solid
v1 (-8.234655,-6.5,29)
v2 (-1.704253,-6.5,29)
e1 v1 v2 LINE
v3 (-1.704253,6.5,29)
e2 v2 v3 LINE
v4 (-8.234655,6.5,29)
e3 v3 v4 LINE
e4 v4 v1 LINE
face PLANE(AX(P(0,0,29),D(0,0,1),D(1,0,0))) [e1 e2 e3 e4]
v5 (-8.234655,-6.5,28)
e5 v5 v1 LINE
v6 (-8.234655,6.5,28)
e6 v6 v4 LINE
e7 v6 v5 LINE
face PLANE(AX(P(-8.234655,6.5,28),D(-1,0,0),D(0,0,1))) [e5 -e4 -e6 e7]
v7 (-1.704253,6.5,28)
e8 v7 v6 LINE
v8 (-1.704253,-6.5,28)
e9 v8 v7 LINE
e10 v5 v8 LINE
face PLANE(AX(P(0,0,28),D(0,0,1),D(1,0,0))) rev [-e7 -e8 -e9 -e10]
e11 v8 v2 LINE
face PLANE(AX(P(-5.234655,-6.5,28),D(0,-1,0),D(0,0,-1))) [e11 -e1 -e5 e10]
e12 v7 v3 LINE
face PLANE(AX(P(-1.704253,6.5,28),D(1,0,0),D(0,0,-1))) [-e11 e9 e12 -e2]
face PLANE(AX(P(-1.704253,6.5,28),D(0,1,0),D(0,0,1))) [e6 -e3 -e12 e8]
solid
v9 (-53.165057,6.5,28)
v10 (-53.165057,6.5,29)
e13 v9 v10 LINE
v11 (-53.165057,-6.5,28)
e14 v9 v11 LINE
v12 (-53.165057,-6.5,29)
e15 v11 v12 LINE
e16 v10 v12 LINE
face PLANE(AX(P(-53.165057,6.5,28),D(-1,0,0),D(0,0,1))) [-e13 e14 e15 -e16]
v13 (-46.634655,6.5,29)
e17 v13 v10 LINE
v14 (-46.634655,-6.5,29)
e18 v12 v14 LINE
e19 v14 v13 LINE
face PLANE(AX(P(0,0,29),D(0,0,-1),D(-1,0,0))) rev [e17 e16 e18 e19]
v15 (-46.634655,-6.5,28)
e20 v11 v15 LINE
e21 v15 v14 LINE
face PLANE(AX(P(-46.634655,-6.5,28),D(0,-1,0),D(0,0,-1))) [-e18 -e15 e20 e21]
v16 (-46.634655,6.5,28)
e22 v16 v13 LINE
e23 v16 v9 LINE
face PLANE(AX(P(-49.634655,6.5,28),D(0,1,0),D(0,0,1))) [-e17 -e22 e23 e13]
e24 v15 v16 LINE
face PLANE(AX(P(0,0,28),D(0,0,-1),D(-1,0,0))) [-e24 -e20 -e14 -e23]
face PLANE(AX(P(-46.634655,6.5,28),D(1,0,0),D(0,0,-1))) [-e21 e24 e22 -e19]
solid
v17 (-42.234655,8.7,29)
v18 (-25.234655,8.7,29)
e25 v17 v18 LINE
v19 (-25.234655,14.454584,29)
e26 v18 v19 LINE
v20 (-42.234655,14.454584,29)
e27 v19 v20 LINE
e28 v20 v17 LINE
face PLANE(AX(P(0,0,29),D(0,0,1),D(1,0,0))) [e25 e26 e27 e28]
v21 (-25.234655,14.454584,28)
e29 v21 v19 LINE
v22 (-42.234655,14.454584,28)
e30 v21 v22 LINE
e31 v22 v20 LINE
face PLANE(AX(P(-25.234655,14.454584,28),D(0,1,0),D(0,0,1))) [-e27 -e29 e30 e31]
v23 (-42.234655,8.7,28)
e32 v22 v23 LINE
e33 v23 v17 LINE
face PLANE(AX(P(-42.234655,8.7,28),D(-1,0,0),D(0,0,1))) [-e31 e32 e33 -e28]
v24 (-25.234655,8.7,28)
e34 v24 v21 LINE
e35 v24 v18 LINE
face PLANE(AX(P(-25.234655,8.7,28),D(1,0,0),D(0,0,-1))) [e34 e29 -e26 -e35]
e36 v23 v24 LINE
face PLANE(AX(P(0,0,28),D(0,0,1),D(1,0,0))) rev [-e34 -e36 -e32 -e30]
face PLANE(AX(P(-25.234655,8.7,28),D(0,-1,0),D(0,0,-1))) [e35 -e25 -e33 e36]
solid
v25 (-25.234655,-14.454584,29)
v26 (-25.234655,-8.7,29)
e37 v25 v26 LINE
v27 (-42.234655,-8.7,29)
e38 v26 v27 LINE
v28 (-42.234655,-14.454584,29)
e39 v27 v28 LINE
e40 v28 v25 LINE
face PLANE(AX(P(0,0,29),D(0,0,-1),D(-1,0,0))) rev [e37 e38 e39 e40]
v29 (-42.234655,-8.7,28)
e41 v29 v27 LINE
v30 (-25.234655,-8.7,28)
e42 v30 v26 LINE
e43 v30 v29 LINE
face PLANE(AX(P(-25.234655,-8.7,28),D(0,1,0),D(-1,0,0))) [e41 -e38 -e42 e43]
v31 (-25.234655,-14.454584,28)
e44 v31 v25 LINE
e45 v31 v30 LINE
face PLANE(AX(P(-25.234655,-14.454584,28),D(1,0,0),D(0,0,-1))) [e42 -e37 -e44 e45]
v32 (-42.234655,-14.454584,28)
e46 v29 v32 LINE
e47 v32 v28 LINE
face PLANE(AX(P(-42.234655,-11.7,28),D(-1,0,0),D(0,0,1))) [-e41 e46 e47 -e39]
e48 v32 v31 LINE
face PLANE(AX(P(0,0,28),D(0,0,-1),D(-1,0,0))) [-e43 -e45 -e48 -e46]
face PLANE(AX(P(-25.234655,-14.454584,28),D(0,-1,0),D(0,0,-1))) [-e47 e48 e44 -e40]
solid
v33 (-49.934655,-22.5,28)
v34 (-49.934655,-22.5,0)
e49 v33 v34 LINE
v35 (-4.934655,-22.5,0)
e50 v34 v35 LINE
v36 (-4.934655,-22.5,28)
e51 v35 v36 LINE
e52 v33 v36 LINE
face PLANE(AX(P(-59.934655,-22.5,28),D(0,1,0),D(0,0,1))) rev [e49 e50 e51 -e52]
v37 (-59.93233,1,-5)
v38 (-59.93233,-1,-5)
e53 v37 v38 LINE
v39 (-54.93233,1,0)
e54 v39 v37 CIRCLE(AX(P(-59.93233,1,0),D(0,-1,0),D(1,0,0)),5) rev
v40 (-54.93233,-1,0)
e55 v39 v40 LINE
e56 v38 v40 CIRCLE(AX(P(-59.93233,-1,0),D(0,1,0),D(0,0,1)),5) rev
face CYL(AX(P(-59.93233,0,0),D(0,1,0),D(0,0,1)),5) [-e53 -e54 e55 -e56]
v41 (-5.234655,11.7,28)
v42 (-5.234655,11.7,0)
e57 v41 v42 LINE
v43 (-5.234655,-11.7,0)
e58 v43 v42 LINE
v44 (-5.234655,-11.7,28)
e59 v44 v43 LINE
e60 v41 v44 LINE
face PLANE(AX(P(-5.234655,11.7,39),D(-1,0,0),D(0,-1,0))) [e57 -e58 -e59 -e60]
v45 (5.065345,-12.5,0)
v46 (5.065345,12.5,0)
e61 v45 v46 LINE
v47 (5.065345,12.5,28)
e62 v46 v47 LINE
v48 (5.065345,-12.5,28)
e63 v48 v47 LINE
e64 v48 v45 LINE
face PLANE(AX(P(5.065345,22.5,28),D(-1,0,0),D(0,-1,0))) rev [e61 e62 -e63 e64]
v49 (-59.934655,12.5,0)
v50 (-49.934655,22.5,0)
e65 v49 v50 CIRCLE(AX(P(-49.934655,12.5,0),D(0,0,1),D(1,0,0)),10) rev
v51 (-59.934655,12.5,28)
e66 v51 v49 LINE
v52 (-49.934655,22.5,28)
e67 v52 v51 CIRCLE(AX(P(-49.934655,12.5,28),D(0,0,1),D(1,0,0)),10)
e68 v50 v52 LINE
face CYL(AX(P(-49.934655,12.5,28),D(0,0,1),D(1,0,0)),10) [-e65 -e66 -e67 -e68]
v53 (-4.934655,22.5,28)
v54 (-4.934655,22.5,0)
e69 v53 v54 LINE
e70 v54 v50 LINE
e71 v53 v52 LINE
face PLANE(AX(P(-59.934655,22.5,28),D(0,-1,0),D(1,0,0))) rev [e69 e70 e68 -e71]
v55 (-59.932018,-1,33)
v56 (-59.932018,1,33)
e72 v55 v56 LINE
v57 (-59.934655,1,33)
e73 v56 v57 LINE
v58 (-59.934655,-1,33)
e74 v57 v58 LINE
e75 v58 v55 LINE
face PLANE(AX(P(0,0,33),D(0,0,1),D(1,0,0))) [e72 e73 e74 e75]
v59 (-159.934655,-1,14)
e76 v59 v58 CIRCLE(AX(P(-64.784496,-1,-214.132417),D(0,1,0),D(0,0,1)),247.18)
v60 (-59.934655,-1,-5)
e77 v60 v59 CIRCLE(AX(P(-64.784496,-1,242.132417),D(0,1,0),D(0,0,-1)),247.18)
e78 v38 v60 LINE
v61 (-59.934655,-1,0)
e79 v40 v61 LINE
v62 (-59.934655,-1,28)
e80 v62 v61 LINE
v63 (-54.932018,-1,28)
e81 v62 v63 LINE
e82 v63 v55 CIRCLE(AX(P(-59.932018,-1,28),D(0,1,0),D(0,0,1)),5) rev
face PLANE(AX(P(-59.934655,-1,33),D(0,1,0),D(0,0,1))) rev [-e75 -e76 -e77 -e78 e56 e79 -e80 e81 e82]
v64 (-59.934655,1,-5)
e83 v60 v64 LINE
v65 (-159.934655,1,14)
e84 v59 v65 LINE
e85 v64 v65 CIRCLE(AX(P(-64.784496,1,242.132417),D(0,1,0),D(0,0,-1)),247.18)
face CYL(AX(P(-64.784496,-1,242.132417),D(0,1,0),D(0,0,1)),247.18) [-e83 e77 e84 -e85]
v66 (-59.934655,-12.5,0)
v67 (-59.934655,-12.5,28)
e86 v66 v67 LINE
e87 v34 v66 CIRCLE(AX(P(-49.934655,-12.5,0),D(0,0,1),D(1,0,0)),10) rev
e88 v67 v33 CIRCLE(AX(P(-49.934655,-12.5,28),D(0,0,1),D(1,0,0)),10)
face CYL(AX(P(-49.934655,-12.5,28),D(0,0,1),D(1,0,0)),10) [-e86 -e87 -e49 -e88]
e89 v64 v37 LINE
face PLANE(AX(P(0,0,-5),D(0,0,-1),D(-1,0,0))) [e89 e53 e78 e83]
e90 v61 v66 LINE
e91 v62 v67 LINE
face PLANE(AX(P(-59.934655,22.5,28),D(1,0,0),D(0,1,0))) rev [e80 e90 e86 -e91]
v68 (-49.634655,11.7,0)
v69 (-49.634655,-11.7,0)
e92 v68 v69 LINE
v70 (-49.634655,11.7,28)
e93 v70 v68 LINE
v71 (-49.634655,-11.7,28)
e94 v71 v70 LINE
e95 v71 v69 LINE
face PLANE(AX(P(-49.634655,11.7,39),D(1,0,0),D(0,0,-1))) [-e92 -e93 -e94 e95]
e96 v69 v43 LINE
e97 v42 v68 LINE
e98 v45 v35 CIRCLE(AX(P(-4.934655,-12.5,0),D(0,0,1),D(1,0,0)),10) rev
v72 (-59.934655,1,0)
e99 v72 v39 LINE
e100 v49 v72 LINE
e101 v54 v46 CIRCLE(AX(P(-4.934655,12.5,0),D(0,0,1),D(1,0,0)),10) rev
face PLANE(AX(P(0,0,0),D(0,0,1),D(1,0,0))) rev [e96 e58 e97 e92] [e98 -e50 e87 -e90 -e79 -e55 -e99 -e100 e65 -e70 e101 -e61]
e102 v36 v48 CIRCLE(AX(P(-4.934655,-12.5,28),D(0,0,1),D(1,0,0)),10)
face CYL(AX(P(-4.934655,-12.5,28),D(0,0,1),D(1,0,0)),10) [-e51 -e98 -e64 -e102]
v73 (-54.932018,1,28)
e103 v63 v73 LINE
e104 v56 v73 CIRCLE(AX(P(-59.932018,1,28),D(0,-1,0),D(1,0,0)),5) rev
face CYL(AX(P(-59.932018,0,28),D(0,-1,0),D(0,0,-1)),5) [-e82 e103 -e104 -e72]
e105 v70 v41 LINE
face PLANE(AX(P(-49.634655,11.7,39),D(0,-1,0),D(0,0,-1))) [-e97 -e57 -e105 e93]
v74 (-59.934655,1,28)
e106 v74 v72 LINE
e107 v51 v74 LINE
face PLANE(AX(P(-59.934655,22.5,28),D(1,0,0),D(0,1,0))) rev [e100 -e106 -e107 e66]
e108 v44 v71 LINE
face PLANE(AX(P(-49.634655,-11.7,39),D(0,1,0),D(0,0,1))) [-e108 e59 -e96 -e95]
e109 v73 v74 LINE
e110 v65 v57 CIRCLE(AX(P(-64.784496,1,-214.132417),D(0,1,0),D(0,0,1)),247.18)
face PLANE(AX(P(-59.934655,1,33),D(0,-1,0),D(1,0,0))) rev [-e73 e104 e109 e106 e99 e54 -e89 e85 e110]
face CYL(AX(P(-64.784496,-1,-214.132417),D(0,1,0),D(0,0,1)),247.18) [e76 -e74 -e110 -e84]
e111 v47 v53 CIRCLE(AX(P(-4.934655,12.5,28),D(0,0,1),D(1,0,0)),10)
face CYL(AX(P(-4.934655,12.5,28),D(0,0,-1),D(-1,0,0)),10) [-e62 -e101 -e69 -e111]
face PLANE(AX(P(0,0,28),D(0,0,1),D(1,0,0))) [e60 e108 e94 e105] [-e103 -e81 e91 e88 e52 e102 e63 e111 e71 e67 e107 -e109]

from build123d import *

# Parameters (mm, degrees)
SKETCH_1_W           = 65
SKETCH_1_H           = 45
EXTRUDE_1_DEPTH      = 28
SKETCH_2_W           = 44.4
SKETCH_2_H           = 23.4
CUT_EXTRUDE_1_DEPTH  = 39
FILLET_1_R           = 10
FILLET_2_R           = 10
FILLET_3_R           = 10
FILLET_4_R           = 10
EXTRUDE_6_DEPTH      = 1
EXTRUDE_6_2_DEPTH    = 1
EXTRUDE_6_3_DEPTH    = 1
SKETCH_10_W          = 17
SKETCH_10_H          = 5.754584259
EXTRUDE_6_4_DEPTH    = 1
SKETCH_20_W          = 5.002637397
SKETCH_20_H          = 2
EXTRUDE_7_DEPTH      = 5
SKETCH_21_W          = 5.00232547
SKETCH_21_H          = 2
EXTRUDE_8_DEPTH      = 5
EXTRUDE_9_DEPTH      = 1
EXTRUDE_9_DEPTH_BACK = 1
FILLET_5_R           = 5
FILLET_6_R           = 5


with BuildPart() as part:
    # 草圖1 → 填料-伸長1 (new body)
    with BuildSketch(Plane.XY):
        with Locations((-27.434655272, 0)):
            Rectangle(SKETCH_1_W, SKETCH_1_H)
    extrude(amount=EXTRUDE_1_DEPTH)

    # 草圖2 → 除料-伸長1 (cut)
    with BuildSketch(Plane.XY):
        with Locations((-27.434655272, 0)):
            Rectangle(SKETCH_2_W, SKETCH_2_H)
    extrude(amount=CUT_EXTRUDE_1_DEPTH, mode=Mode.SUBTRACT)

    # 圓角1
    fillet_1_edges = [part.edges().sort_by_distance(p)[0] for p in [
        (-59.934655272, -22.5, 14),
    ]]
    fillet(fillet_1_edges, radius=FILLET_1_R)

    # 圓角2
    fillet_2_edges = [part.edges().sort_by_distance(p)[0] for p in [
        (-59.934655272, 22.5, 14),
    ]]
    fillet(fillet_2_edges, radius=FILLET_2_R)

    # 圓角3
    fillet_3_edges = [part.edges().sort_by_distance(p)[0] for p in [
        (5.065344728, 22.5, 14),
    ]]
    fillet(fillet_3_edges, radius=FILLET_3_R)

    # 圓角4
    fillet_4_edges = [part.edges().sort_by_distance(p)[0] for p in [
        (5.065344728, -22.5, 14),
    ]]
    fillet(fillet_4_edges, radius=FILLET_4_R)

    # 草圖20 → 填料-伸長7 (add)
    with BuildSketch(Plane.XY.offset(28)):
        with Locations((-57.433336574, 0)):
            Rectangle(SKETCH_20_W, SKETCH_20_H)
    extrude(amount=EXTRUDE_7_DEPTH)

    # 草圖21 → 填料-伸長8 (add)
    with BuildSketch(Plane(origin=(0, 0, 0), x_dir=(-1, 0, 0), z_dir=(0, 0, -1))):
        with Locations((57.433492537, 0)):
            Rectangle(SKETCH_21_W, SKETCH_21_H)
    extrude(amount=EXTRUDE_8_DEPTH)

    # 草圖22 → 填料-伸長9 (add, two sides: drawn at the far end of the back side and taken through both)
    with BuildSketch(Plane(origin=(0, 0, 0), x_dir=(1, 0, 0), z_dir=(0, 1, 0)).offset(-EXTRUDE_9_DEPTH_BACK)):
        with BuildLine():
            Line((-59.934655272, 5), (-59.934655272, -33))
            ThreePointArc((-59.934655272, -33), (-110.92327451, -28.70325915), (-159.934655272, -14))
            ThreePointArc((-159.934655272, -14), (-110.92327451, 0.70325915), (-59.934655272, 5))
        make_face()
    extrude(amount=EXTRUDE_9_DEPTH + EXTRUDE_9_DEPTH_BACK)

    # 圓角5
    fillet_5_edges = [part.edges().sort_by_distance(p)[0] for p in [
        (-54.932329802, 0, -5),
    ]]
    fillet(fillet_5_edges, radius=FILLET_5_R - 0.0001)  # a hair under: the kernel refuses the full size

    # 圓角6
    fillet_6_edges = [part.edges().sort_by_distance(p)[0] for p in [
        (-54.932017875, 0, 33),
    ]]
    fillet(fillet_6_edges, radius=FILLET_6_R - 0.0001)  # a hair under: the kernel refuses the full size


with BuildPart() as body_2:
    # 草圖10 → 填料-伸長6 (new body)
    with BuildSketch(Plane.XY.offset(29)):
        Polygon((-49.634655272, 6.5), (-53.165057103, 6.5), (-53.165057103, -6.5), (-46.634655272, -6.5), (-46.634655272, 6.5), align=None)
    extrude(amount=-EXTRUDE_6_DEPTH)


with BuildPart() as body_3:
    # 草圖10 → Extrude 6 2 (new body)
    with BuildSketch(Plane.XY.offset(29)):
        Polygon((-42.234655272, -11.7), (-42.234655272, -8.7), (-25.234655272, -8.7), (-25.234655272, -14.454584259), (-42.234655272, -14.454584259), align=None)
    extrude(amount=-EXTRUDE_6_2_DEPTH)


with BuildPart() as body_4:
    # 草圖10 → Extrude 6 3 (new body)
    with BuildSketch(Plane.XY.offset(29)):
        Polygon((-8.234655272, 6.5), (-8.234655272, -6.5), (-5.234655272, -6.5), (-1.70425344, -6.5), (-1.70425344, 6.5), align=None)
    extrude(amount=-EXTRUDE_6_3_DEPTH)


with BuildPart() as body_5:
    # 草圖10 → Extrude 6 4 (new body)
    with BuildSketch(Plane.XY.offset(29)):
        with Locations((-33.734655272, 11.57729213)):
            Rectangle(SKETCH_10_W, SKETCH_10_H)
    extrude(amount=-EXTRUDE_6_4_DEPTH)


solid = Compound([part.part, body_2.part, body_3.part, body_4.part, body_5.part])
